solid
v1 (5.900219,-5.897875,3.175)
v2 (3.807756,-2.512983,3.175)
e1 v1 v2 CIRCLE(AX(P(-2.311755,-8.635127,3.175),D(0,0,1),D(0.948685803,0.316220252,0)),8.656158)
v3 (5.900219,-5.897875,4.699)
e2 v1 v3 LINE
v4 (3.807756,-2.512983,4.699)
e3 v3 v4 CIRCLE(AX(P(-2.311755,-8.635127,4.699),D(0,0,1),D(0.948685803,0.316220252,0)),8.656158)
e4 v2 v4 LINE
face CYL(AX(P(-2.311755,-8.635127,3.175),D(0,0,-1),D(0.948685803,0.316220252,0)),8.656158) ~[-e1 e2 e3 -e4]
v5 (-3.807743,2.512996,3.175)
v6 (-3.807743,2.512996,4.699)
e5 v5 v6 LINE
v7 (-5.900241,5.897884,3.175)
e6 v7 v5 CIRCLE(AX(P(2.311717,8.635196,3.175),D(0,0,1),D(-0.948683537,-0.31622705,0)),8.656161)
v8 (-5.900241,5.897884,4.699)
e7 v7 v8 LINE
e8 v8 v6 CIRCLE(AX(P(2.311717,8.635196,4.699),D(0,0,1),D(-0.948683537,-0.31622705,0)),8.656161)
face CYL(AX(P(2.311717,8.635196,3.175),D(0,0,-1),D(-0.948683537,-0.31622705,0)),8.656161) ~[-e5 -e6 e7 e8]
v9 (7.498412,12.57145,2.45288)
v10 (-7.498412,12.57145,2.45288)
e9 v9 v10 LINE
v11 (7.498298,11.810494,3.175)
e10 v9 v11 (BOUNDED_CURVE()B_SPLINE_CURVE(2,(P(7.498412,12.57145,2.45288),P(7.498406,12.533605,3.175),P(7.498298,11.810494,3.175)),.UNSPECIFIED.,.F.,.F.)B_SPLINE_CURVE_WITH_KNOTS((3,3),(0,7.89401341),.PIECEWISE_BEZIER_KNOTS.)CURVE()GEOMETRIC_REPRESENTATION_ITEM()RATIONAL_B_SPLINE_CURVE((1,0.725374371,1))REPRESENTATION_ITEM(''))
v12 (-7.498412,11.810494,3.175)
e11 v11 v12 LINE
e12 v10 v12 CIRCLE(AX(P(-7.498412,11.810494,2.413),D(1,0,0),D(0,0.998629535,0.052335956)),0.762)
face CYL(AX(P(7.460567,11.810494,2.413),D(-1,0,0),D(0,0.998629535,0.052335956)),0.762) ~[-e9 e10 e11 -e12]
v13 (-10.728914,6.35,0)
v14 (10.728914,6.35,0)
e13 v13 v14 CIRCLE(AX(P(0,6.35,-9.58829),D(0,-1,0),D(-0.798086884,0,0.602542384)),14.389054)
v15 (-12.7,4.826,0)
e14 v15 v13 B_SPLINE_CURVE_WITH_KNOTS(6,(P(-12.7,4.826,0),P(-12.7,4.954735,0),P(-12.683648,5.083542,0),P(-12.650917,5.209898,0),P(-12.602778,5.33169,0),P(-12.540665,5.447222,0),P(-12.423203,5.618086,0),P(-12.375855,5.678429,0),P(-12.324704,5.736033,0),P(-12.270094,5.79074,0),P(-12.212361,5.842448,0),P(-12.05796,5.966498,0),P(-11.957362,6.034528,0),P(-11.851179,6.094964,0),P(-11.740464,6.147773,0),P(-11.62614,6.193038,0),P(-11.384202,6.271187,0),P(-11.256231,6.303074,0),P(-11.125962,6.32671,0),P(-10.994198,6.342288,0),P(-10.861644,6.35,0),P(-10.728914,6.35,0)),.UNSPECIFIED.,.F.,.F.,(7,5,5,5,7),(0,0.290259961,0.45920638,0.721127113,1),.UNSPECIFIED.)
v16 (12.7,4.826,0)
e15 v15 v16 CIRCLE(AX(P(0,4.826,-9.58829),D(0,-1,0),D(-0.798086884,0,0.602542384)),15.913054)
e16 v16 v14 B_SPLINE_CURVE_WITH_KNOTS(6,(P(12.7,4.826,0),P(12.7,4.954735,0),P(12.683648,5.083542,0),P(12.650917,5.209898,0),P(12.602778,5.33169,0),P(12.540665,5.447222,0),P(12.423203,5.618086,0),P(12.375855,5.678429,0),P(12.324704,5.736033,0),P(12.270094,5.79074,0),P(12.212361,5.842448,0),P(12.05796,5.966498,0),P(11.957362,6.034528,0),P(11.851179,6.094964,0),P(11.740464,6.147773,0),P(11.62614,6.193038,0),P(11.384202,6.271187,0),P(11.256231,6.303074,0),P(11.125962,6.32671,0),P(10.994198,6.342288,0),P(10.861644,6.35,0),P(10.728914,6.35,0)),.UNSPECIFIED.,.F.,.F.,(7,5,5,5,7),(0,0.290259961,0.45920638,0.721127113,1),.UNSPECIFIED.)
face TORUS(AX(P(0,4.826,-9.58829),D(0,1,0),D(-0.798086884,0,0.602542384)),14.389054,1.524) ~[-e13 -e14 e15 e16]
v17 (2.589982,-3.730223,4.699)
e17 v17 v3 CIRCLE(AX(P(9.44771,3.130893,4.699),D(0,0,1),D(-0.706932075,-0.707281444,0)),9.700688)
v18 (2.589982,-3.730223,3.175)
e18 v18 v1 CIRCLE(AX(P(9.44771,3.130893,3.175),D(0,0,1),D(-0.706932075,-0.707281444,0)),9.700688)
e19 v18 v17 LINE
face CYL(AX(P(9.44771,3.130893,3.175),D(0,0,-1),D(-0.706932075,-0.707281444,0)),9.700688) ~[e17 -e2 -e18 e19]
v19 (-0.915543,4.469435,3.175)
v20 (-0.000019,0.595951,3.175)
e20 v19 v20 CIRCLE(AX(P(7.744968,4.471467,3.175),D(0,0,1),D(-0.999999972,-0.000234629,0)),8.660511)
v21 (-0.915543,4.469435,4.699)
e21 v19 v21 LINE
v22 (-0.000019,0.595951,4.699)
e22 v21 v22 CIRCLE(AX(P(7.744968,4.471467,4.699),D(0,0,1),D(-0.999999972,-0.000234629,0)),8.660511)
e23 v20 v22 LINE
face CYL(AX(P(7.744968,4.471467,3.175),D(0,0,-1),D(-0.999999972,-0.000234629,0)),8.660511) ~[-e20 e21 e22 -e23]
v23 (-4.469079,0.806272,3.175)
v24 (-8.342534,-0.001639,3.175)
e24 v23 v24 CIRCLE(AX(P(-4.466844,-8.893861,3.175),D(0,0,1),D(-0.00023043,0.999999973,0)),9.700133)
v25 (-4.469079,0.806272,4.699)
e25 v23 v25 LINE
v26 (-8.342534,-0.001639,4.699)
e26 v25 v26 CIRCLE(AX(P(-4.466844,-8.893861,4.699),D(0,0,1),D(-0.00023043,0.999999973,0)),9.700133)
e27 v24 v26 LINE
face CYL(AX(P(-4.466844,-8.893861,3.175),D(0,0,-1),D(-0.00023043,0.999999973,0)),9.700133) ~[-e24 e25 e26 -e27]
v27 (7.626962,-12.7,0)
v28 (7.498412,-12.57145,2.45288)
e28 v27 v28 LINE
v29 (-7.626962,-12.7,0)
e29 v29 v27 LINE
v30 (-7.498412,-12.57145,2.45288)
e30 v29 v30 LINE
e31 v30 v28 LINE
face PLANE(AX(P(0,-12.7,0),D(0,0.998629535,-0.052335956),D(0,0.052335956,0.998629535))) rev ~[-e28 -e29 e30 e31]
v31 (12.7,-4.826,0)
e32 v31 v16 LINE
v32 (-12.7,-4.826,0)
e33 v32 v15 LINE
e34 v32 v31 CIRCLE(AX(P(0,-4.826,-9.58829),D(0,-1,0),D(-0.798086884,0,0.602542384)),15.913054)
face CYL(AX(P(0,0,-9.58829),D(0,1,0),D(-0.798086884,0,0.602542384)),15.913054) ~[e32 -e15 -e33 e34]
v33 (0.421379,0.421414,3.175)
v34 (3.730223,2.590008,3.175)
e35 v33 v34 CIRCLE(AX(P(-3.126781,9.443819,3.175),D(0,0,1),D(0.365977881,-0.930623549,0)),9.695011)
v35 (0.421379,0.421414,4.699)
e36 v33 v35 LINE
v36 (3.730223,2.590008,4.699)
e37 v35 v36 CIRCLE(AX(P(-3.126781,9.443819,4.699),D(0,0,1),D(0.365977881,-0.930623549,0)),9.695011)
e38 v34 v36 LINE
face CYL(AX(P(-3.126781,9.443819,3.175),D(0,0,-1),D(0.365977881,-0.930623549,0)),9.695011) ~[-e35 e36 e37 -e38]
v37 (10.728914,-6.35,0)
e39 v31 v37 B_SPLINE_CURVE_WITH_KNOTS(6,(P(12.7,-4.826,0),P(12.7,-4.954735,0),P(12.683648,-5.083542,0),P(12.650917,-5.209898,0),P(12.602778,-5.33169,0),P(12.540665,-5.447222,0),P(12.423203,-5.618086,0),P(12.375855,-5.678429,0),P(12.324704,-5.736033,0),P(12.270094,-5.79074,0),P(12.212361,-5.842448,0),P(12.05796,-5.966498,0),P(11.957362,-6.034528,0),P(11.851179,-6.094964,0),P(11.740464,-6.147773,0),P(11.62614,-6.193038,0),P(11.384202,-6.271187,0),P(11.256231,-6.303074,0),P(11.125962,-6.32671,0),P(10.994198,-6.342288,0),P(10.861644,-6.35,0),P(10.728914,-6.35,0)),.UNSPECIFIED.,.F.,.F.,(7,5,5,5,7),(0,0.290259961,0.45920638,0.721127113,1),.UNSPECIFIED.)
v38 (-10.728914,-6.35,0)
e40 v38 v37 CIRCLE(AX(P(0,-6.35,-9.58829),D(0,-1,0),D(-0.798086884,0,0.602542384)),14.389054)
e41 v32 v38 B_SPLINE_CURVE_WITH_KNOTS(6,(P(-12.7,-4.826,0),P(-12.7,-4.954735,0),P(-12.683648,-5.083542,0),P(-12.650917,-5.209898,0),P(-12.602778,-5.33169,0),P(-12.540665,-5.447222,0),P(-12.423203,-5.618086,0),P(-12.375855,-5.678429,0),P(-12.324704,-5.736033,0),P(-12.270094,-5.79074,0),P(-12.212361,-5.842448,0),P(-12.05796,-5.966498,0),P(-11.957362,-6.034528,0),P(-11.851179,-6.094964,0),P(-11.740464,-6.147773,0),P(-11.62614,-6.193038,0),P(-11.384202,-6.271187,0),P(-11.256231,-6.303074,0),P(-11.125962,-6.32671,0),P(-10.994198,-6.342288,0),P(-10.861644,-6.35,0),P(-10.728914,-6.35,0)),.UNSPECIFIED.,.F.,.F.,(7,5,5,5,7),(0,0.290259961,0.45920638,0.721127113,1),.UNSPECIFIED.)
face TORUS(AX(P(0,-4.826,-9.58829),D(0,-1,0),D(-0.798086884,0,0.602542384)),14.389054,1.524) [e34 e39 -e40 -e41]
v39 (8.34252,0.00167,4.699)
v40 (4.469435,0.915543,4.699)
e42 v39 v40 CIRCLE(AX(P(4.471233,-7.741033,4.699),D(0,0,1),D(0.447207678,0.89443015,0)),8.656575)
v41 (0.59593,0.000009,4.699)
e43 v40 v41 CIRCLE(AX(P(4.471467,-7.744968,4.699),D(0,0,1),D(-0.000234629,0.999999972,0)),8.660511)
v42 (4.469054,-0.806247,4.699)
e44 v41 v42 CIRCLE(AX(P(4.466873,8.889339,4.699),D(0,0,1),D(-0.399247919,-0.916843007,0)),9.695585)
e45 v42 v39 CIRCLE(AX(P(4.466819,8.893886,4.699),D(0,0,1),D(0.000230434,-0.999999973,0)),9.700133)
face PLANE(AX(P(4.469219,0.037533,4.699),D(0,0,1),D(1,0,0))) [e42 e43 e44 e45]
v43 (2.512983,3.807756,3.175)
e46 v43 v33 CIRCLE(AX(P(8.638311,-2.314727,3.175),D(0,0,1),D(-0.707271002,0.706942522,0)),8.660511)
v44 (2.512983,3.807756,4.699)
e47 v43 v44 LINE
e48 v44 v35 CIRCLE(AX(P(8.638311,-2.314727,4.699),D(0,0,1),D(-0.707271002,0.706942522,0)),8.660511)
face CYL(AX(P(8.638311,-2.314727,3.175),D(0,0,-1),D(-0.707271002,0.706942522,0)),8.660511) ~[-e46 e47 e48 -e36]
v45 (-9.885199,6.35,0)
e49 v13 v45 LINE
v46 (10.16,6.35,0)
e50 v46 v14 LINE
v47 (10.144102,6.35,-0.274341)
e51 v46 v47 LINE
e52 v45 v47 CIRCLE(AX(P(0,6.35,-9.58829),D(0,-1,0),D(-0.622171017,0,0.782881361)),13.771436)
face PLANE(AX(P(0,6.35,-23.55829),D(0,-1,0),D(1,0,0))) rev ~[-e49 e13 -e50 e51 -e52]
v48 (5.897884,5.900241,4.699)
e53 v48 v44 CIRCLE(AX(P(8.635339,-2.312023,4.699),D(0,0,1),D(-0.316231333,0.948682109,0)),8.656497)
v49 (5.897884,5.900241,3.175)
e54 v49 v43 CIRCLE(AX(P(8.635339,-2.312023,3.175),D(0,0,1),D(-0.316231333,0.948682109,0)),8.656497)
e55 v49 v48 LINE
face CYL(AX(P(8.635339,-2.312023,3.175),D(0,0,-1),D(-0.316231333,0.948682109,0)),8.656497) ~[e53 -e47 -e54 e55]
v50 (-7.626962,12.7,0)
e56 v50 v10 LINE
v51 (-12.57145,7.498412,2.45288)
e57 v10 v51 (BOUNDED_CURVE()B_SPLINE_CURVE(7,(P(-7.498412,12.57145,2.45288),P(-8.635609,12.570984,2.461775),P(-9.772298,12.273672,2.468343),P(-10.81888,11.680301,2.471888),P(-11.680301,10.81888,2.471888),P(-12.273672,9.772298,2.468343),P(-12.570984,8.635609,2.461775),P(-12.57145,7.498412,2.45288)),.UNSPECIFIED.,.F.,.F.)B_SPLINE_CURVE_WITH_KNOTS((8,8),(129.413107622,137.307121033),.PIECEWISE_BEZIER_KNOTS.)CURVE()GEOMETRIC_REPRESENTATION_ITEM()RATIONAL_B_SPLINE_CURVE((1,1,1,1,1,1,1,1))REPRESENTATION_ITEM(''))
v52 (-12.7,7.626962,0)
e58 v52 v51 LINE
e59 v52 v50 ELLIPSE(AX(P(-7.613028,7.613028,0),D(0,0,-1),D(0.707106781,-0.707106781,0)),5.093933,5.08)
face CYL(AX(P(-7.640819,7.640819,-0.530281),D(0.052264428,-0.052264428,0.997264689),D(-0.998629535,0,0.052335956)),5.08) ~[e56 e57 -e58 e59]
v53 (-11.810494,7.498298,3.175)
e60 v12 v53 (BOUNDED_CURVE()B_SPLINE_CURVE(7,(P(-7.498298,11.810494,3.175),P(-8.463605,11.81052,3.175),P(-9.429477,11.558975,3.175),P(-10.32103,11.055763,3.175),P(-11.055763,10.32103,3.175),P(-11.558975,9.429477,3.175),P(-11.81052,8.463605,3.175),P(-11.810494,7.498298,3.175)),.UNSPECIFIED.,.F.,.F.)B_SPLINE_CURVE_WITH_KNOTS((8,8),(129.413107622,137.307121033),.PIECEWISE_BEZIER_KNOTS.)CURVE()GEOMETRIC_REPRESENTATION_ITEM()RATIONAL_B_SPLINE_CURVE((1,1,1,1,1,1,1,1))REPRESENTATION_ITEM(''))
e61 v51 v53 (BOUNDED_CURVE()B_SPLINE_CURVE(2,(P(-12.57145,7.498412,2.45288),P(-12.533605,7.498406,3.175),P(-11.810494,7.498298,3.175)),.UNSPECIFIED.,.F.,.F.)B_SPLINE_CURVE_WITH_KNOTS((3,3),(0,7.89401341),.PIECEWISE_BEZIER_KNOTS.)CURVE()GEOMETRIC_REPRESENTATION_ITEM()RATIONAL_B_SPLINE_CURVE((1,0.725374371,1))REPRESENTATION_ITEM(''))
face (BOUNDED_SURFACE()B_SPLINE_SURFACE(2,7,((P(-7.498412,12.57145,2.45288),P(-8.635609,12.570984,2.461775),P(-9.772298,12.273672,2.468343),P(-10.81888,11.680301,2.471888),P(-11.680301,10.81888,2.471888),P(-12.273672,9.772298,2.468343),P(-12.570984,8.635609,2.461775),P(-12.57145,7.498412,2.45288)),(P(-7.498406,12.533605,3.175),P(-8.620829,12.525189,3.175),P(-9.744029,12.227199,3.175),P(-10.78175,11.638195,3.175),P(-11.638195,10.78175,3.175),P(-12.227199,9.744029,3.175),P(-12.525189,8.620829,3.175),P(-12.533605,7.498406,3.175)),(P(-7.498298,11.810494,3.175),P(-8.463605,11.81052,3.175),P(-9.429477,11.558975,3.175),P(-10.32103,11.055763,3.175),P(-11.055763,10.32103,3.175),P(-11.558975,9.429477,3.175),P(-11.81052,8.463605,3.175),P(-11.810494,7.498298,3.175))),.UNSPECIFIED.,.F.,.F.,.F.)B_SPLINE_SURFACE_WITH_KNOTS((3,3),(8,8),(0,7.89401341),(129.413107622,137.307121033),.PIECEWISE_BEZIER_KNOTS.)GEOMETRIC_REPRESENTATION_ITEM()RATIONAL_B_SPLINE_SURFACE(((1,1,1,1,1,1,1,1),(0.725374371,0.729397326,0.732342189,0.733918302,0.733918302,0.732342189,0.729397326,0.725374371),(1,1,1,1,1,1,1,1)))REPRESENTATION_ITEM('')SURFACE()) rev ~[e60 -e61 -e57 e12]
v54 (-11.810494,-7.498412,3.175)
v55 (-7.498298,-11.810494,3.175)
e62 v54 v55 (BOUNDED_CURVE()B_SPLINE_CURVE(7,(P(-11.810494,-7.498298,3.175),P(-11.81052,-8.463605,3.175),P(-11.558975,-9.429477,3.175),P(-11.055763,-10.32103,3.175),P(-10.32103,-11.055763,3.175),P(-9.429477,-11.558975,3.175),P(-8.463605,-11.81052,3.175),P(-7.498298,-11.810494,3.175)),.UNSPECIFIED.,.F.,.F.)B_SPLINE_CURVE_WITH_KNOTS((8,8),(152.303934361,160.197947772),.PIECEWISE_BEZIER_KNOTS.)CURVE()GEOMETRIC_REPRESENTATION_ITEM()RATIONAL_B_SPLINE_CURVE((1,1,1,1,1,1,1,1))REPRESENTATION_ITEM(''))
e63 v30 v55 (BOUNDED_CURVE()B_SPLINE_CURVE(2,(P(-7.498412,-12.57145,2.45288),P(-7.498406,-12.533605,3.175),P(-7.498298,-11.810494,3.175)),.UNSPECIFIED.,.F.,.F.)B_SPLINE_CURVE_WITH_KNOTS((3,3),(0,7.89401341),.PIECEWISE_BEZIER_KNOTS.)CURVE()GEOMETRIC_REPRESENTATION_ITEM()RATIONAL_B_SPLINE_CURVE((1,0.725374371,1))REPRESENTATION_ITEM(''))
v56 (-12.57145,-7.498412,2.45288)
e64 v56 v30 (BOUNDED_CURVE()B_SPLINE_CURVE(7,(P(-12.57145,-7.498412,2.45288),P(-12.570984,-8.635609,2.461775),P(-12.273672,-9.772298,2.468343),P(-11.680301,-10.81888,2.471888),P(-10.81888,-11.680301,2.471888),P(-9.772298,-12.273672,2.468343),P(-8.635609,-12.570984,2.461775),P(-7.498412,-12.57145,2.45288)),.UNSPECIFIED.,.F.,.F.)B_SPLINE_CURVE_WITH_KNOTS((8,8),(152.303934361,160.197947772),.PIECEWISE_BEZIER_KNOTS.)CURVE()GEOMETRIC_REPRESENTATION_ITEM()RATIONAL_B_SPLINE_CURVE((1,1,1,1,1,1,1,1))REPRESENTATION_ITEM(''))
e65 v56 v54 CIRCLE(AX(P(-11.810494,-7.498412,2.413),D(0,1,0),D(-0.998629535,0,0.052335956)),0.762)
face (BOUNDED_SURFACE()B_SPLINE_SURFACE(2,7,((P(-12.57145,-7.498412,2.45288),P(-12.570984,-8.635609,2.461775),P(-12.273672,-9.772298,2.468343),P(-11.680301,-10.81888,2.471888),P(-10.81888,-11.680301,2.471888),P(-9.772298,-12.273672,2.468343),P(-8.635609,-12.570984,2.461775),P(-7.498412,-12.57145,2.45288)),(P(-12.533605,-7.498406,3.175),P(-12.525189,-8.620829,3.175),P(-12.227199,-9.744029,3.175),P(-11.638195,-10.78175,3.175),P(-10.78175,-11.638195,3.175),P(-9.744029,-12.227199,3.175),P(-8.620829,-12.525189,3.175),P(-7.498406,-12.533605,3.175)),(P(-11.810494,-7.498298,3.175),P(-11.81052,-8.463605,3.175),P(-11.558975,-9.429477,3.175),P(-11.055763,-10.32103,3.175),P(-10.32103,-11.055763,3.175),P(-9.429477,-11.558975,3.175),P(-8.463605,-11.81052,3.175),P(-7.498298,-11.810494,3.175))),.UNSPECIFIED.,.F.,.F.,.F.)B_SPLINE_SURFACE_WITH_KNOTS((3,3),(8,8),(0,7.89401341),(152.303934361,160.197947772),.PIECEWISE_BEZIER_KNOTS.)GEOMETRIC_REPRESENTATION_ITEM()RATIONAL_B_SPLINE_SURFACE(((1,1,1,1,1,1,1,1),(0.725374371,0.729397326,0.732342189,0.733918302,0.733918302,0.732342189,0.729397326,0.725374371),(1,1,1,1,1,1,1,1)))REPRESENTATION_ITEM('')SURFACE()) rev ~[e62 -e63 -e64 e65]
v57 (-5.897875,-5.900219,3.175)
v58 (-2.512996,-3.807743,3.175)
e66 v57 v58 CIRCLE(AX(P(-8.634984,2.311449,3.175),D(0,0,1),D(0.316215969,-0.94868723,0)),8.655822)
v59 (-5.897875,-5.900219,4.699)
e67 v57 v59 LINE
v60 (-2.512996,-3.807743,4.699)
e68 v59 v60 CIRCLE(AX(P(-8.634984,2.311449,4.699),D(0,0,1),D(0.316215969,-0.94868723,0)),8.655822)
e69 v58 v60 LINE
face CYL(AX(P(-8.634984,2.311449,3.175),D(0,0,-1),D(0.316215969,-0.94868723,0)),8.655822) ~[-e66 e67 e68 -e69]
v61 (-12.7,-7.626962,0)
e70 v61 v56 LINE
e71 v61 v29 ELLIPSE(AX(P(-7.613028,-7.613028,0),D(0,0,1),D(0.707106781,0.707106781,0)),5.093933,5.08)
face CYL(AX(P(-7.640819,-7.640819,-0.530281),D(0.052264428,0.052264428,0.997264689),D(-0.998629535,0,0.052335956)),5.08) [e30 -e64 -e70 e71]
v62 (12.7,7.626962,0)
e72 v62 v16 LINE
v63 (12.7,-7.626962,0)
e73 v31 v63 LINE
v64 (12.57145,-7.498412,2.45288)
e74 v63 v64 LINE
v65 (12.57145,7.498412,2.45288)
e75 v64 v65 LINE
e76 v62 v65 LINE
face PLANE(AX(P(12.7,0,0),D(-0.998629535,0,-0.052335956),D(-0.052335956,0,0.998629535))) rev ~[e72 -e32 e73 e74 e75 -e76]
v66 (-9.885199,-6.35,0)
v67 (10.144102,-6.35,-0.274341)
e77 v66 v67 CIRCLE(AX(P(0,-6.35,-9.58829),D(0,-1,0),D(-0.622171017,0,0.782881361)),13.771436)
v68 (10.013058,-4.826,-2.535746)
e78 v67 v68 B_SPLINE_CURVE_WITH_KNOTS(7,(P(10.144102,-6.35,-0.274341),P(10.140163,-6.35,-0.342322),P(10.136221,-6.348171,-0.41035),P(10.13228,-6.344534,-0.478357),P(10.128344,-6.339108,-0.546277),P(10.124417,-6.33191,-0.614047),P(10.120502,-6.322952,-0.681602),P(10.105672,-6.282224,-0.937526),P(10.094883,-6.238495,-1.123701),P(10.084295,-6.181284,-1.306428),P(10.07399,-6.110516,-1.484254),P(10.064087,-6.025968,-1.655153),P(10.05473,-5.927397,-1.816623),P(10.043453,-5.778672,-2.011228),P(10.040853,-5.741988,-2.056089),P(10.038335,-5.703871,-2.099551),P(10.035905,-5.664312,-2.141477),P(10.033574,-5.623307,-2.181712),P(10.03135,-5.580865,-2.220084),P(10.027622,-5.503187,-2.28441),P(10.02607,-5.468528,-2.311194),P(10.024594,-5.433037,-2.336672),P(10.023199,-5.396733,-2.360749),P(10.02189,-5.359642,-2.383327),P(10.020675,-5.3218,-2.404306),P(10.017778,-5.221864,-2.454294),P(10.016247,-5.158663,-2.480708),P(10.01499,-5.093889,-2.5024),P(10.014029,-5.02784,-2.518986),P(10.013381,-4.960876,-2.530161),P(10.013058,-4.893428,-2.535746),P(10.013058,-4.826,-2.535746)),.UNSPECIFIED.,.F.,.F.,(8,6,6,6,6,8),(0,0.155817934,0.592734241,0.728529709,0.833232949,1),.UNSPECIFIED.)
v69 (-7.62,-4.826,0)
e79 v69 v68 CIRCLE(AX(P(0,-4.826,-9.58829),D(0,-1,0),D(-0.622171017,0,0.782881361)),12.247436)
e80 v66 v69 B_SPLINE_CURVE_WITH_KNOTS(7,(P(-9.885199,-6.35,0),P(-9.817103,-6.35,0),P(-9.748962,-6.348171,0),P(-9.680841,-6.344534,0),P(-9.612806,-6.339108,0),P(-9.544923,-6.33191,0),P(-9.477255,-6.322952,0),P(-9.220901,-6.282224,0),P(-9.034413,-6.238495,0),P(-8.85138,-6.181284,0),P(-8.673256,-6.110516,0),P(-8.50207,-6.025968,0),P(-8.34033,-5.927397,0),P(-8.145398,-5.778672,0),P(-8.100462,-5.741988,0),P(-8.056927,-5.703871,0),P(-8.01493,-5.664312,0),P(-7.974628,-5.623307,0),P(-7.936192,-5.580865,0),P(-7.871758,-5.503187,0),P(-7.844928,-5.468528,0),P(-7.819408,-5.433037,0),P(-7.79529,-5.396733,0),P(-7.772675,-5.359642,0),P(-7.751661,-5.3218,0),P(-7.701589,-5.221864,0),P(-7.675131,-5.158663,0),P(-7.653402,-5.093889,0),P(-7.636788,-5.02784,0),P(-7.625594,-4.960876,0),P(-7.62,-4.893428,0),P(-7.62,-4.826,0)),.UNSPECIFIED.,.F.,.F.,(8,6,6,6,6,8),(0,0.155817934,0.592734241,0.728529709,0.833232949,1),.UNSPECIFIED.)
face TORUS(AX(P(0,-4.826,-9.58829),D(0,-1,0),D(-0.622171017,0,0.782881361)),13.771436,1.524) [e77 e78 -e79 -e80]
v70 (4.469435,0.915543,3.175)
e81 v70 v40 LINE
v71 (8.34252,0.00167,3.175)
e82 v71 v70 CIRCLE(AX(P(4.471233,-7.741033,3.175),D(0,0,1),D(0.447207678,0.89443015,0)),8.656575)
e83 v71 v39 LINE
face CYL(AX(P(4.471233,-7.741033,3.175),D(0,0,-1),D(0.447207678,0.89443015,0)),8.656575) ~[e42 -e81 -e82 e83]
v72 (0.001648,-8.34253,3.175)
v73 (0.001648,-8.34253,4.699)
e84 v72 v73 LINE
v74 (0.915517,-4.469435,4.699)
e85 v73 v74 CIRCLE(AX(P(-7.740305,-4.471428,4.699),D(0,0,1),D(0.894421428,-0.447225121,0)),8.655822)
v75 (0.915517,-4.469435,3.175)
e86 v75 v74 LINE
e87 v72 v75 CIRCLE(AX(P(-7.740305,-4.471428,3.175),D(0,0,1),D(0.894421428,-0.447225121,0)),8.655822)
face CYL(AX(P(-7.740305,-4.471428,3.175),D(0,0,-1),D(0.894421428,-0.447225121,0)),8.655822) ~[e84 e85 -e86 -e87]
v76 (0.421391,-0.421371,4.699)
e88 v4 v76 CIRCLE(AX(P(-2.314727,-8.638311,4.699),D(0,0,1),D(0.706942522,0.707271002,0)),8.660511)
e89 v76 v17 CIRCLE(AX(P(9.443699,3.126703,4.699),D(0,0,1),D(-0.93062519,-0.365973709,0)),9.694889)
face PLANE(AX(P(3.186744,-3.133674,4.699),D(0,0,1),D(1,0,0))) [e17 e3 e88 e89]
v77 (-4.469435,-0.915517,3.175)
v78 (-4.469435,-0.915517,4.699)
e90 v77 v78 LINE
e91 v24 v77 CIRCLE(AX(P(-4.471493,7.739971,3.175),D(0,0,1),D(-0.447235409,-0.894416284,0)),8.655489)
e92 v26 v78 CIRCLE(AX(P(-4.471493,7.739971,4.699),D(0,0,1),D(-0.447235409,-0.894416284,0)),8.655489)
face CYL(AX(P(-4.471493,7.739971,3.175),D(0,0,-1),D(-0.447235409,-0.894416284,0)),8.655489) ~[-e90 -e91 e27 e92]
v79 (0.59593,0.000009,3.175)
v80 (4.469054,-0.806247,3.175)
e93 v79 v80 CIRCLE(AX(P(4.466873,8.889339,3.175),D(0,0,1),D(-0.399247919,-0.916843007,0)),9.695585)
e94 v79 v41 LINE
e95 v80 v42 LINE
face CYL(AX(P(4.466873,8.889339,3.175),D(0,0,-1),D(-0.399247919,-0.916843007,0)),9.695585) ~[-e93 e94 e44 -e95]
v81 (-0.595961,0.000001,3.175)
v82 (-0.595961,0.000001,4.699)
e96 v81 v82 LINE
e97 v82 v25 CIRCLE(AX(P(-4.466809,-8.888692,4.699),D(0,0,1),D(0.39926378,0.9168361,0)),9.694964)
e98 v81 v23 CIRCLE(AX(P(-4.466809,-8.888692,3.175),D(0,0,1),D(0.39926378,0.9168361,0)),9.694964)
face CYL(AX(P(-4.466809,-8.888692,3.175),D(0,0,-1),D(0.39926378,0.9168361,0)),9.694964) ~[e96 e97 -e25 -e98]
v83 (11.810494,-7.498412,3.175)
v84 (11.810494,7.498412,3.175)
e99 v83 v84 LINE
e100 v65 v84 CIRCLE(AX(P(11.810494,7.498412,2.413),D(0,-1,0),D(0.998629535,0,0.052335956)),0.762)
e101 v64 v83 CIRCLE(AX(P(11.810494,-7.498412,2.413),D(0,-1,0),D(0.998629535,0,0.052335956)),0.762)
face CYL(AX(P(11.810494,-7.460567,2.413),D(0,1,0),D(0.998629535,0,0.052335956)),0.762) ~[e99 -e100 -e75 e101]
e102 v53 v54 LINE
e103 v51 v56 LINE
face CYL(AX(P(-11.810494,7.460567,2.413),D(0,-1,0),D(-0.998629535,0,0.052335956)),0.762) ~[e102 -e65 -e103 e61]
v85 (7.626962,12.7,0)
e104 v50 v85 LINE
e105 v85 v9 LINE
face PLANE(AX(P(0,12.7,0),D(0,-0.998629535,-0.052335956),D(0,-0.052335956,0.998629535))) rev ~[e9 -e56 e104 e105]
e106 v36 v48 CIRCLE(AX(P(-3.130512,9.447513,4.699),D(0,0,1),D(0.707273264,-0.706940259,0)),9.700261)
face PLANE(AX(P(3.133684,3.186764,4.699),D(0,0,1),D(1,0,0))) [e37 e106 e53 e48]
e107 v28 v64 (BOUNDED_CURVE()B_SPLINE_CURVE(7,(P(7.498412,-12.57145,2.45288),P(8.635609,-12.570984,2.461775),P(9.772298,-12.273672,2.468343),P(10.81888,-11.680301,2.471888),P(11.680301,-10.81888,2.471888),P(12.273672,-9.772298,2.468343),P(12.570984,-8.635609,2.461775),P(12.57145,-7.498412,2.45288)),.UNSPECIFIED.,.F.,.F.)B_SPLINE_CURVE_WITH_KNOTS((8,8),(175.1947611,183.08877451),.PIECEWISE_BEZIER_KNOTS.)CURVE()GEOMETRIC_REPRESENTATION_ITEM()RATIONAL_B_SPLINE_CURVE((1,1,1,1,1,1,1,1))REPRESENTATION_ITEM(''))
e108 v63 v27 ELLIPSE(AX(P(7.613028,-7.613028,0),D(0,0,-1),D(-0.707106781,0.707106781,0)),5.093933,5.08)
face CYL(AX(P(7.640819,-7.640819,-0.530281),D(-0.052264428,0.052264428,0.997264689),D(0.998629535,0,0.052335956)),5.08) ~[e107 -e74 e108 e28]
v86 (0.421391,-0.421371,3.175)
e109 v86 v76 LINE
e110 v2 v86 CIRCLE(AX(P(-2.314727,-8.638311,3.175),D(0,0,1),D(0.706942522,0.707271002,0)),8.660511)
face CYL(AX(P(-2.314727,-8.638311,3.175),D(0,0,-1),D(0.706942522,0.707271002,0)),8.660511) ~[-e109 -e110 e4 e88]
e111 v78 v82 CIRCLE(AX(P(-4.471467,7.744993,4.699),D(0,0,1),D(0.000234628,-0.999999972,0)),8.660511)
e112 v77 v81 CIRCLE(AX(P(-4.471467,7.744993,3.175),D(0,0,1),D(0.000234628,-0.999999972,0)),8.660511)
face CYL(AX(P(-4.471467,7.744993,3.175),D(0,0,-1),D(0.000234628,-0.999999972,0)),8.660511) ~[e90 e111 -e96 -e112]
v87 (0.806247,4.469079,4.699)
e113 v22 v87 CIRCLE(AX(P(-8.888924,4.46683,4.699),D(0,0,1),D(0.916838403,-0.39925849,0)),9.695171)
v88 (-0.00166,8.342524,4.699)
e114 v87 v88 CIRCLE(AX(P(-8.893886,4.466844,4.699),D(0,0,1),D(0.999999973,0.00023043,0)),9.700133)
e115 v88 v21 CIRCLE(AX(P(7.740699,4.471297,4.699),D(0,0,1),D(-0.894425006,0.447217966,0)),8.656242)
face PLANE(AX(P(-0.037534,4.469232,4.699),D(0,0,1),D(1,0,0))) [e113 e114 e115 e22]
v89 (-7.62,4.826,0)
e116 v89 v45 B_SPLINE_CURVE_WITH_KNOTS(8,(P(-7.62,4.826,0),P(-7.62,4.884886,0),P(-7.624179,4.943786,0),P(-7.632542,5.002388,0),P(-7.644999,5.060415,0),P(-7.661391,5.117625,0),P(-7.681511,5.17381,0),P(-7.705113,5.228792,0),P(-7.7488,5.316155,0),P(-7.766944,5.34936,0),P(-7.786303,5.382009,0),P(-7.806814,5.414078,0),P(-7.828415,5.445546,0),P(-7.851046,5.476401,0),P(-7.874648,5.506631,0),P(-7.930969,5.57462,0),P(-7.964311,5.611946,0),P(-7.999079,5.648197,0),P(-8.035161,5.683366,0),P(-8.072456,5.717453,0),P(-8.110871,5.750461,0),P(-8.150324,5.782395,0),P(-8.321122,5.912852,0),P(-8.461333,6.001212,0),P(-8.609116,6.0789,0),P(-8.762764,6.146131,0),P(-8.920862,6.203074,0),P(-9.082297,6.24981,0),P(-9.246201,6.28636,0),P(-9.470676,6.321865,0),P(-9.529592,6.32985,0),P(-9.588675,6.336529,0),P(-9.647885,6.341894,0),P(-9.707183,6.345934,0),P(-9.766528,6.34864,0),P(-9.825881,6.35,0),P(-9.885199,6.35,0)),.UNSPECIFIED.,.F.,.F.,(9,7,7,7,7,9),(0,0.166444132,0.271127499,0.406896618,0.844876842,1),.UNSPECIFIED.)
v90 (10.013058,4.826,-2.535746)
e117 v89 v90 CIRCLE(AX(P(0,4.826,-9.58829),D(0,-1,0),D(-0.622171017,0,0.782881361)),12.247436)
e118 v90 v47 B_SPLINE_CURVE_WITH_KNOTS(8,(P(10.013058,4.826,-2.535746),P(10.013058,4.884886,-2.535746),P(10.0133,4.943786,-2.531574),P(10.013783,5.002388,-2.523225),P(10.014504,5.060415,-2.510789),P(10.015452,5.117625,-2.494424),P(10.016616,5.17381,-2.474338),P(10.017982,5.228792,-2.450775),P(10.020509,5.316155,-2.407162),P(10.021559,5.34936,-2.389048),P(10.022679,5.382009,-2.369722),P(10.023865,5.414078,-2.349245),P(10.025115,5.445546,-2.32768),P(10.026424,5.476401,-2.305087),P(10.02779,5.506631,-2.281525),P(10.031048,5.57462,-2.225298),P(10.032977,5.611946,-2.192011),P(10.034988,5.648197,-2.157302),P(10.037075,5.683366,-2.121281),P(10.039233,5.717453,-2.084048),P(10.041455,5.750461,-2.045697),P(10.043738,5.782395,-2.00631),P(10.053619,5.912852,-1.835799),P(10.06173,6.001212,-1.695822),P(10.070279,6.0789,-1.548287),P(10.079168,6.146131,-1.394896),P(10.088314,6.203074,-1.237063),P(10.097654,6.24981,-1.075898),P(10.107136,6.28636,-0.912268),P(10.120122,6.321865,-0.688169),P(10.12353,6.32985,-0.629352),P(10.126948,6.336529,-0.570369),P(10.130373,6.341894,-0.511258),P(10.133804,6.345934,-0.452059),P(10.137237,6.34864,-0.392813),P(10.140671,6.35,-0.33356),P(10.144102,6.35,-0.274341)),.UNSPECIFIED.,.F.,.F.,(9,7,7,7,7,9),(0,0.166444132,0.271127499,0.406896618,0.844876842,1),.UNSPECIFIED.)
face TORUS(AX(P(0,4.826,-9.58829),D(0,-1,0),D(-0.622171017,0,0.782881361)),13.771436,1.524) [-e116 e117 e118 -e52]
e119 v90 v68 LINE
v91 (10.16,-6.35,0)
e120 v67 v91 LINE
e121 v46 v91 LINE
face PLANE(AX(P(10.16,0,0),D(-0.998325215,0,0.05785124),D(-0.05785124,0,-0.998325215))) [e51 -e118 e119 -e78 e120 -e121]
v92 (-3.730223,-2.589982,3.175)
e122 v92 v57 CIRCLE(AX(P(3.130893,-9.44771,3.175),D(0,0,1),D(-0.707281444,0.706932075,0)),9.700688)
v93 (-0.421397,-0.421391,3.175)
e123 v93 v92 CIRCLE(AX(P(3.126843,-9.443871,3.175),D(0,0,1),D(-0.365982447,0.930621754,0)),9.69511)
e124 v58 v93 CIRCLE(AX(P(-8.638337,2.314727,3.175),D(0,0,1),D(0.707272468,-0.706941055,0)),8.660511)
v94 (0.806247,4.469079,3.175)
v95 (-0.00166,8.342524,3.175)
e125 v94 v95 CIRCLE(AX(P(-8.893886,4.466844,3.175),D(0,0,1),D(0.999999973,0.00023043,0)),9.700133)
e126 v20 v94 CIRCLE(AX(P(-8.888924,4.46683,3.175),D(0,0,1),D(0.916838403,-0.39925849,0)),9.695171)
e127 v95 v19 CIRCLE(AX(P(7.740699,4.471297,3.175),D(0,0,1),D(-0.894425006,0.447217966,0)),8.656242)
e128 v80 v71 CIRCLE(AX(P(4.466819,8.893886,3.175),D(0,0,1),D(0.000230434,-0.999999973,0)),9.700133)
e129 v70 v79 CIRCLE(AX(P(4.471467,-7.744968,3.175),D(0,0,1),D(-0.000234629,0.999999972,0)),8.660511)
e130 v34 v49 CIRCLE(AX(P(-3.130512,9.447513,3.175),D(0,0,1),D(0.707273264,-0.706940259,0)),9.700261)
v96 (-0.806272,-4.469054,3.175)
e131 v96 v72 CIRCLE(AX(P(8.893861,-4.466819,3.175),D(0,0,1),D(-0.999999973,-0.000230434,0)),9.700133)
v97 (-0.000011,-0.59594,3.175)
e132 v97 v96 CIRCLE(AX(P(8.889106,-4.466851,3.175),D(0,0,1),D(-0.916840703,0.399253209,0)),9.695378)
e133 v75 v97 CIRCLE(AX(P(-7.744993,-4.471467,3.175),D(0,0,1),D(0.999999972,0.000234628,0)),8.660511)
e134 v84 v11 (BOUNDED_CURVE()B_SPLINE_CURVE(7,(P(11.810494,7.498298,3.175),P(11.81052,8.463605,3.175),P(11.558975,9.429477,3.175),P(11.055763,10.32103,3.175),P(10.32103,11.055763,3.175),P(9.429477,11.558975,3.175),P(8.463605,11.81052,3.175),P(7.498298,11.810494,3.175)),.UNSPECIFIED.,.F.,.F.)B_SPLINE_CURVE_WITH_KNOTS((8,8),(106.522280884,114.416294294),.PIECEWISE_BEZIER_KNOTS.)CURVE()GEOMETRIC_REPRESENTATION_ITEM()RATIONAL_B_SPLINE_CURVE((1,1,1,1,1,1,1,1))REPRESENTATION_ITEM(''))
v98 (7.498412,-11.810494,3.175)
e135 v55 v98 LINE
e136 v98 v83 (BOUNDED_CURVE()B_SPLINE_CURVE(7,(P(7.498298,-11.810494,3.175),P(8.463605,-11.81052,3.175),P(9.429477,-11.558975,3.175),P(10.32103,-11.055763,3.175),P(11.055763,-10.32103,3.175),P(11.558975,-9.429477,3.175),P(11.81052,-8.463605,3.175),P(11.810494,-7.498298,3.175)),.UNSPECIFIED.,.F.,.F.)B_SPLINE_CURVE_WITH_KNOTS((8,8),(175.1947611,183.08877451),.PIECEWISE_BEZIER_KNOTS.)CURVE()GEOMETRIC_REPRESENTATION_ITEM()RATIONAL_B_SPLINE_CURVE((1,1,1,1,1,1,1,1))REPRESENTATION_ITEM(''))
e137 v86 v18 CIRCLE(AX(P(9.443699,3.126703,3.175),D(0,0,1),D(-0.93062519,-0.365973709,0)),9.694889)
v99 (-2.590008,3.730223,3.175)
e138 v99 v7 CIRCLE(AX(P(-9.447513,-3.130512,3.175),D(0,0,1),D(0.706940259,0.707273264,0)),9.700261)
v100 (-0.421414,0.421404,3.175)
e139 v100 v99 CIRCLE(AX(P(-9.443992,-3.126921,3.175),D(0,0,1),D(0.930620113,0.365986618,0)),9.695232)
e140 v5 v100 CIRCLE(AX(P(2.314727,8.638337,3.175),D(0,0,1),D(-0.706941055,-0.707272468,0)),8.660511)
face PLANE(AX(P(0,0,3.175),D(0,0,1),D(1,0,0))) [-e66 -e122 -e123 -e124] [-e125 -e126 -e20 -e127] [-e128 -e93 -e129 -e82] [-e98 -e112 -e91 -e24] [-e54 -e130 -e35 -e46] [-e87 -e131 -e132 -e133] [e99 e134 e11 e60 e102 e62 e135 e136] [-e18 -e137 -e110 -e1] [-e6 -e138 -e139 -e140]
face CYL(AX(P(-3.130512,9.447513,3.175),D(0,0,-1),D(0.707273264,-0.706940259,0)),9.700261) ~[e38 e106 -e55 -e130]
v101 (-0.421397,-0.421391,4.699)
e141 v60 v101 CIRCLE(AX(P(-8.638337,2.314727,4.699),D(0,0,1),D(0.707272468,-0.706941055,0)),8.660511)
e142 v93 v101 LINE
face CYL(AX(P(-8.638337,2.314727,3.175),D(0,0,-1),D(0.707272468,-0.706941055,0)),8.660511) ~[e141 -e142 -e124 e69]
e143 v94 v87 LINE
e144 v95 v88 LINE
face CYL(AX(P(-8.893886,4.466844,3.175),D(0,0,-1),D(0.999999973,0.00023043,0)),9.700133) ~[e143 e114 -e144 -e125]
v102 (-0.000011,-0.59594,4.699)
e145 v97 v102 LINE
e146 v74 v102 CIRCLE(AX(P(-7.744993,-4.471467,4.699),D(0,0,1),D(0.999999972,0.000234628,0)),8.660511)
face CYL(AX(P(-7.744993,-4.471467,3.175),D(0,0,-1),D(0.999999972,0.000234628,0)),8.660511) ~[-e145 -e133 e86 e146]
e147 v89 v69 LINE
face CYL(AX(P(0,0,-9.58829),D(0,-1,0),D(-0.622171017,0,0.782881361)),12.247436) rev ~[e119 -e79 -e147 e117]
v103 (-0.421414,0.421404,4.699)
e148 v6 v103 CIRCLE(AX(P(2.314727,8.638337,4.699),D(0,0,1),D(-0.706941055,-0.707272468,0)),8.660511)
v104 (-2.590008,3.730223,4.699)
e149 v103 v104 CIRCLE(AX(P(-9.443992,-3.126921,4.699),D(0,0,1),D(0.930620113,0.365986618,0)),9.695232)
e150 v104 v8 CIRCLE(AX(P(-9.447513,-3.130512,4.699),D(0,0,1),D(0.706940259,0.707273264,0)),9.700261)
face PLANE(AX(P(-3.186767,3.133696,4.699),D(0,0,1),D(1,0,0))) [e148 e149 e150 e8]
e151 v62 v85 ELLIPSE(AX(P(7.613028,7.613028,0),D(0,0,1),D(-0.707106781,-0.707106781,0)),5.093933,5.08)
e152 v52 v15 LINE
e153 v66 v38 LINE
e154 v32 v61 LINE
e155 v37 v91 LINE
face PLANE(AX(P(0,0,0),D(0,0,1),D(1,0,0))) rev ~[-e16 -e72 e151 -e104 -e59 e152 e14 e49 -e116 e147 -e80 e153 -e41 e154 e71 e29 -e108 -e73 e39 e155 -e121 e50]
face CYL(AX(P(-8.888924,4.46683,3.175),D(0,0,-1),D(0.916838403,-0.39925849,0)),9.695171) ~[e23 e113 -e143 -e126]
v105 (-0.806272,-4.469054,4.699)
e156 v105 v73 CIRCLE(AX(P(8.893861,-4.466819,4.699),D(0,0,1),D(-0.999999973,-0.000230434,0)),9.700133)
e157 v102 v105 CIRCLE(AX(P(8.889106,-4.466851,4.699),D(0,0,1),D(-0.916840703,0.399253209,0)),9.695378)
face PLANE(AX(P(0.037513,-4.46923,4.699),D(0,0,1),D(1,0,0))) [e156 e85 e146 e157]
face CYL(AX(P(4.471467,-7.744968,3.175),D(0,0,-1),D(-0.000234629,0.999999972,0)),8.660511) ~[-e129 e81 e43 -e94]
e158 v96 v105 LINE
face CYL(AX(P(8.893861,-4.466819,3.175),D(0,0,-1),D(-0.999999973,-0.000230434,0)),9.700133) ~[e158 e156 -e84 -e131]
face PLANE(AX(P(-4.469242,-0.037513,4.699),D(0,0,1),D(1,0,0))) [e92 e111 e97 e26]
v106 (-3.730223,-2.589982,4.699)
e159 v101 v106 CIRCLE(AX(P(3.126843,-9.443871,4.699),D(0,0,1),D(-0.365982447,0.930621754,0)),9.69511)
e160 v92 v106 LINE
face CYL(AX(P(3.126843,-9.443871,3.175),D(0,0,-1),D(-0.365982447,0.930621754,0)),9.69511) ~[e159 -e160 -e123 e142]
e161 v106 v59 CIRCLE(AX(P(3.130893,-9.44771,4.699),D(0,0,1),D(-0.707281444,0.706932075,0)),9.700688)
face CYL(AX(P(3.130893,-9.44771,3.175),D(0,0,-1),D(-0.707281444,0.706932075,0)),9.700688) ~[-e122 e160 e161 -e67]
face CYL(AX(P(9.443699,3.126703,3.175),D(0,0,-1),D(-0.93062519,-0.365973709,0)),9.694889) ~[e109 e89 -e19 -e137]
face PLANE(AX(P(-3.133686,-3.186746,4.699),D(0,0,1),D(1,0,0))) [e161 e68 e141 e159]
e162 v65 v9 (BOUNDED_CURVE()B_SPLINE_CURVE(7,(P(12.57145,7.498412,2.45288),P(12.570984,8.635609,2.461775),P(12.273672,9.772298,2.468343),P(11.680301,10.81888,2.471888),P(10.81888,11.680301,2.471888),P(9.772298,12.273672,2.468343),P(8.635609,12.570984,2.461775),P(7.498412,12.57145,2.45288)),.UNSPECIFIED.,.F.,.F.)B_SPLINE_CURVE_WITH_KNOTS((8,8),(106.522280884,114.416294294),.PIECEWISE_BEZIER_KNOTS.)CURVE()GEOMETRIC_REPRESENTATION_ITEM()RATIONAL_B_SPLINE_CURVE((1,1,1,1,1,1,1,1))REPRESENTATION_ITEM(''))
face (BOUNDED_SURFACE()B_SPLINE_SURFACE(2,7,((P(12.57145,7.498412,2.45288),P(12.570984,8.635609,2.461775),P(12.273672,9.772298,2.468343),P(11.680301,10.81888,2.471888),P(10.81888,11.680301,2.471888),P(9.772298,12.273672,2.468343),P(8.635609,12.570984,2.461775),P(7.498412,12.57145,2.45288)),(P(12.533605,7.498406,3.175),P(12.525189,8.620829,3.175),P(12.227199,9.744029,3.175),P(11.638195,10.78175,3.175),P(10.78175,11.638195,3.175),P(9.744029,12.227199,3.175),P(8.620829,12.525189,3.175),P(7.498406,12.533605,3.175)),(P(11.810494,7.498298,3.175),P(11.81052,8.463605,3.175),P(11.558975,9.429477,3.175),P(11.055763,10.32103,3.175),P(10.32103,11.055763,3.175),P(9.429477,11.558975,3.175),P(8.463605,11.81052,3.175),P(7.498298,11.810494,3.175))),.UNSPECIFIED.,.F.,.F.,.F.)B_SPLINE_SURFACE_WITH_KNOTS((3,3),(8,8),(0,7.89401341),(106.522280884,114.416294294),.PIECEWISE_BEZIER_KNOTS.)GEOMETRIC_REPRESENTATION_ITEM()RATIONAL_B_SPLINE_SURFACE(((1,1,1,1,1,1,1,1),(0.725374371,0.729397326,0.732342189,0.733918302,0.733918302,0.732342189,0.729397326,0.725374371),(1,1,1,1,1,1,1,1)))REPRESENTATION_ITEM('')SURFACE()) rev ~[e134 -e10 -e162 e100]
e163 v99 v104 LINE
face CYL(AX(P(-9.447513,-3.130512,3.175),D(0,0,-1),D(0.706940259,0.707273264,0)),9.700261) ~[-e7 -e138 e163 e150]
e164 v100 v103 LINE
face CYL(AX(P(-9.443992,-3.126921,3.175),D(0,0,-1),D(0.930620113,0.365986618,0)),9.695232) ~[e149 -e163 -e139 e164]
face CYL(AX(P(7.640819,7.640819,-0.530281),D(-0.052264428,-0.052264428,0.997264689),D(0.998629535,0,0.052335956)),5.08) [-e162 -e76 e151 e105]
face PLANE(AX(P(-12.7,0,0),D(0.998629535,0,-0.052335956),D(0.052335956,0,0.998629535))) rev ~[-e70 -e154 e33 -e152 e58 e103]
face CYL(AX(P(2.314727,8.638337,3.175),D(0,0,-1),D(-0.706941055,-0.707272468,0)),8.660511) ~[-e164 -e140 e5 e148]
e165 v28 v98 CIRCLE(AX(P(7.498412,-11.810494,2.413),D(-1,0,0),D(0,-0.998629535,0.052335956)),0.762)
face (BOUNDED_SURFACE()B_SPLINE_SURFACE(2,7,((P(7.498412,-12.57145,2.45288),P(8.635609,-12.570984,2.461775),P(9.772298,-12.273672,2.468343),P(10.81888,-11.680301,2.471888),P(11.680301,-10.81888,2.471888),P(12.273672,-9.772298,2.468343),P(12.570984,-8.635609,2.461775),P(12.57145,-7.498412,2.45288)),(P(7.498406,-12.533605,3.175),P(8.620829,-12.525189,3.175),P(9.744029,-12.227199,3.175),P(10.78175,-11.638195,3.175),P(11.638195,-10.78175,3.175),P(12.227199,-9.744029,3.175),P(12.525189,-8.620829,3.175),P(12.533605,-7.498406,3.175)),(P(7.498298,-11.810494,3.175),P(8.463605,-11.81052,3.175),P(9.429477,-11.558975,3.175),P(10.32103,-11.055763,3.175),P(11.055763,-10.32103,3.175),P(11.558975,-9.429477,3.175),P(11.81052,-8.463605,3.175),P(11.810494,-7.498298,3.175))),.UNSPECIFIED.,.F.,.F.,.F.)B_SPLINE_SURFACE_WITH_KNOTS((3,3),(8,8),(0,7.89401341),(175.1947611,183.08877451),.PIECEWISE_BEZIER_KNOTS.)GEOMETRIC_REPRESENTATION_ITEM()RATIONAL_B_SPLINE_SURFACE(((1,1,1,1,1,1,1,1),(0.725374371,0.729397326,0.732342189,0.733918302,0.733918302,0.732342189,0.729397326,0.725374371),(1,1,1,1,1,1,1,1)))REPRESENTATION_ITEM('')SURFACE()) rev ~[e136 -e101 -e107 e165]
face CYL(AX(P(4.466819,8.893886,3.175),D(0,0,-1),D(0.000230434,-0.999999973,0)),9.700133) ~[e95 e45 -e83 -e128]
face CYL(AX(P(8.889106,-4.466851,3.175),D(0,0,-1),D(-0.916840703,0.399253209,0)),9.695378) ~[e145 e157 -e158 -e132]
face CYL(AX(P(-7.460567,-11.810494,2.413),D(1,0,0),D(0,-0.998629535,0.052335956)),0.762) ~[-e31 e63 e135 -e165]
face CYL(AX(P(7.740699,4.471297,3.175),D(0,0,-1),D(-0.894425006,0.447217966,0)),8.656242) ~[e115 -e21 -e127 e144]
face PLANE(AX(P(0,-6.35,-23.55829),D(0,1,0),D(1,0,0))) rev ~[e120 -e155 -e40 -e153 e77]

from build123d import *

# Parameters (mm, degrees)
F0_W      = 25.4
F0_H      = 25.4
F1_DEPTH  = 3.175
F1_TAPER  = 3
F3_W      = 5.08
F3_H      = 12.7
F6_R      = 5.08
F7_R      = 1.524
F8_R      = 0.762
F10_DEPTH = 1.524


# Not quite as in the source:
# - ends of sketch curves that miss each other by under 0.0002 mm in the source are joined


with BuildPart() as f1:
    # F0 (on Top) → F1 (new body)
    with BuildSketch(Plane.XY):
        Rectangle(F0_W, F0_H)
    extrude(amount=F1_DEPTH, taper=F1_TAPER)

    # F4: sweep along a path in F2
    with BuildLine(Plane.XZ) as f4_path:
        ThreePointArc((-10.16, 0), (0, -23.5582897328), (10.16, 0))
    # F3 (on face) → F4 (sweep)
    with BuildSketch(Plane(origin=(0, 0, 0), x_dir=(1, 0, 0), z_dir=(0, 0, -1))):
        with Locations((-10.16, 0)):
            Rectangle(F3_W, F3_H)
    sweep(path=f4_path.line)

    # F6
    f6_edges = [f1.edges().sort_by_distance(p)[0] for p in [
        (-12.616803, 12.616803, 1.5875),
        (-12.616803, -12.616803, 1.5875),
        (12.616803, -12.616803, 1.5875),
        (12.616803, 12.616803, 1.5875),
    ]]
    fillet(f6_edges, radius=F6_R)

    # F7
    f7_edges = [f1.edges().sort_by_distance(p)[0] for p in [
        (0, -6.35, -25.501344),
        (-1.743325, -6.35, -21.711017),
        (-1.743325, 6.35, -21.711017),
        (0, 6.35, -25.501344),
    ]]
    fillet(f7_edges, radius=F7_R)

    # F8
    f8_edges = [f1.edges().sort_by_distance(p)[0] for p in [
        (12.533605, 0, 3.175),
        (11.048589, -11.048589, 3.175),
        (11.048589, 11.048589, 3.175),
        (0, -12.533605, 3.175),
        (0, 12.533605, 3.175),
        (-11.048589, -11.048589, 3.175),
        (-11.048589, 11.048589, 3.175),
        (-12.533605, 0, 3.175),
    ]]
    fillet(f8_edges, radius=F8_R)

    # F9 (on face) → F10 (join)
    with BuildSketch(Plane.XY.offset(3.175)):
        with BuildLine():
            ThreePointArc((-3.8077433876, 2.5129958106), (-2.2363648369, 1.2700255802), (-0.4214138117, 0.4214041575))
            ThreePointArc((-0.4214138117, 0.4214041575), (-1.3351477858, 2.1876037686), (-2.5900078566, 3.7302233456))
            ThreePointArc((-2.5900078566, 3.7302233456), (-4.1334248315, 4.984630209), (-5.9002408115, 5.8978835339))
            ThreePointArc((-5.9002408115, 5.8978835339), (-5.0511449244, 4.0835594737), (-3.8077433876, 2.5129958106))
        make_face()
        with BuildLine():
            ThreePointArc((-0.9155427616, 4.4694347941), (-0.6833212656, 2.4793847644), (-1.9106e-05, 0.5959506396))
            ThreePointArc((-1.9106e-05, 0.5959506396), (0.6027711391, 2.4909604876), (0.8062465423, 4.4690791999))
            ThreePointArc((0.8062465423, 4.4690791999), (0.6018941572, 6.4474337167), (-0.0016602711, 8.3425243592))
            ThreePointArc((-0.0016602711, 8.3425243592), (-0.6841876238, 6.4592135153), (-0.9155427616, 4.4694347941))
        make_face()
        with BuildLine():
            ThreePointArc((2.5129831047, 3.8077560876), (1.2700048982, 2.2363724755), (0.4213787575, 0.4214138117))
            ThreePointArc((0.4213787575, 0.4214138117), (2.1875938836, 1.3351413072), (3.7302233456, 2.5900078566))
            ThreePointArc((3.7302233456, 2.5900078566), (4.984630209, 4.1334248315), (5.8978835339, 5.9002408115))
            ThreePointArc((5.8978835339, 5.9002408115), (4.0835594737, 5.0511449244), (2.5129831047, 3.8077560876))
        make_face()
        with BuildLine():
            ThreePointArc((4.4694347941, 0.9155427616), (2.4793737115, 0.6833186532), (0.5959303259, 8.9412e-06))
            ThreePointArc((0.5959303259, 8.9412e-06), (2.4909366547, -0.6027661778), (4.4690537999, -0.8062465482))
            ThreePointArc((4.4690537999, -0.8062465482), (6.4474197136, -0.6018917801), (8.3425203043, 0.0016695744))
            ThreePointArc((8.3425203043, 0.0016695744), (6.4592115314, 0.6841820987), (4.4694347941, 0.9155427616))
        make_face()
        with BuildLine():
            ThreePointArc((3.8077560876, -2.5129831047), (2.2363622238, -1.2699985662), (0.4213909469, -0.4213711439))
            ThreePointArc((0.4213909469, -0.4213711439), (1.3351159072, -2.1875938836), (2.5899824566, -3.7302233456))
            ThreePointArc((2.5899824566, -3.7302233456), (4.1334074282, -4.9846188126), (5.9002188082, -5.8978748887))
            ThreePointArc((5.9002188082, -5.8978748887), (5.0511428128, -4.0835560578), (3.8077560876, -2.5129831047))
        make_face()
        with BuildLine():
            ThreePointArc((0.9155173616, -4.4694348001), (0.6832945611, -2.4793792452), (-1.13725e-05, -0.5959404907))
            ThreePointArc((-1.13725e-05, -0.5959404907), (-0.6027905445, -2.4909316905), (-0.8062719482, -4.4690537999))
            ThreePointArc((-0.8062719482, -4.4690537999), (-0.601916144, -6.447424681), (0.0016482293, -8.3425296076))
            ThreePointArc((0.0016482293, -8.3425296076), (0.6841820987, -6.4592115314), (0.9155173616, -4.4694348001))
        make_face()
        with BuildLine():
            ThreePointArc((-2.5129958106, -3.8077433876), (-1.2700192482, -2.2363545852), (-0.4213965439, -0.4213909469))
            ThreePointArc((-0.4213965439, -0.4213909469), (-2.1876037686, -1.3351223858), (-3.7302233456, -2.5899824566))
            ThreePointArc((-3.7302233456, -2.5899824566), (-4.9846188126, -4.1334074282), (-5.8978748887, -5.9002188082))
            ThreePointArc((-5.8978748887, -5.9002188082), (-4.0835560578, -5.0511428128), (-2.5129958106, -3.8077433876))
        make_face()
        with BuildLine():
            ThreePointArc((-4.4694348001, -0.9155173616), (-2.4793902981, -0.6832971735), (-0.5959608043, 1.2077e-06))
            ThreePointArc((-0.5959608043, 1.2077e-06), (-2.4909555235, 0.6027955057), (-4.4690791999, 0.8062719423))
            ThreePointArc((-4.4690791999, 0.8062719423), (-6.4474386841, 0.6019185211), (-8.3425336625, -0.0016389259))
            ThreePointArc((-8.3425336625, -0.0016389259), (-6.4592135153, -0.6841876238), (-4.4694348001, -0.9155173616))
        make_face()
    extrude(amount=F10_DEPTH)


solid = f1.part
